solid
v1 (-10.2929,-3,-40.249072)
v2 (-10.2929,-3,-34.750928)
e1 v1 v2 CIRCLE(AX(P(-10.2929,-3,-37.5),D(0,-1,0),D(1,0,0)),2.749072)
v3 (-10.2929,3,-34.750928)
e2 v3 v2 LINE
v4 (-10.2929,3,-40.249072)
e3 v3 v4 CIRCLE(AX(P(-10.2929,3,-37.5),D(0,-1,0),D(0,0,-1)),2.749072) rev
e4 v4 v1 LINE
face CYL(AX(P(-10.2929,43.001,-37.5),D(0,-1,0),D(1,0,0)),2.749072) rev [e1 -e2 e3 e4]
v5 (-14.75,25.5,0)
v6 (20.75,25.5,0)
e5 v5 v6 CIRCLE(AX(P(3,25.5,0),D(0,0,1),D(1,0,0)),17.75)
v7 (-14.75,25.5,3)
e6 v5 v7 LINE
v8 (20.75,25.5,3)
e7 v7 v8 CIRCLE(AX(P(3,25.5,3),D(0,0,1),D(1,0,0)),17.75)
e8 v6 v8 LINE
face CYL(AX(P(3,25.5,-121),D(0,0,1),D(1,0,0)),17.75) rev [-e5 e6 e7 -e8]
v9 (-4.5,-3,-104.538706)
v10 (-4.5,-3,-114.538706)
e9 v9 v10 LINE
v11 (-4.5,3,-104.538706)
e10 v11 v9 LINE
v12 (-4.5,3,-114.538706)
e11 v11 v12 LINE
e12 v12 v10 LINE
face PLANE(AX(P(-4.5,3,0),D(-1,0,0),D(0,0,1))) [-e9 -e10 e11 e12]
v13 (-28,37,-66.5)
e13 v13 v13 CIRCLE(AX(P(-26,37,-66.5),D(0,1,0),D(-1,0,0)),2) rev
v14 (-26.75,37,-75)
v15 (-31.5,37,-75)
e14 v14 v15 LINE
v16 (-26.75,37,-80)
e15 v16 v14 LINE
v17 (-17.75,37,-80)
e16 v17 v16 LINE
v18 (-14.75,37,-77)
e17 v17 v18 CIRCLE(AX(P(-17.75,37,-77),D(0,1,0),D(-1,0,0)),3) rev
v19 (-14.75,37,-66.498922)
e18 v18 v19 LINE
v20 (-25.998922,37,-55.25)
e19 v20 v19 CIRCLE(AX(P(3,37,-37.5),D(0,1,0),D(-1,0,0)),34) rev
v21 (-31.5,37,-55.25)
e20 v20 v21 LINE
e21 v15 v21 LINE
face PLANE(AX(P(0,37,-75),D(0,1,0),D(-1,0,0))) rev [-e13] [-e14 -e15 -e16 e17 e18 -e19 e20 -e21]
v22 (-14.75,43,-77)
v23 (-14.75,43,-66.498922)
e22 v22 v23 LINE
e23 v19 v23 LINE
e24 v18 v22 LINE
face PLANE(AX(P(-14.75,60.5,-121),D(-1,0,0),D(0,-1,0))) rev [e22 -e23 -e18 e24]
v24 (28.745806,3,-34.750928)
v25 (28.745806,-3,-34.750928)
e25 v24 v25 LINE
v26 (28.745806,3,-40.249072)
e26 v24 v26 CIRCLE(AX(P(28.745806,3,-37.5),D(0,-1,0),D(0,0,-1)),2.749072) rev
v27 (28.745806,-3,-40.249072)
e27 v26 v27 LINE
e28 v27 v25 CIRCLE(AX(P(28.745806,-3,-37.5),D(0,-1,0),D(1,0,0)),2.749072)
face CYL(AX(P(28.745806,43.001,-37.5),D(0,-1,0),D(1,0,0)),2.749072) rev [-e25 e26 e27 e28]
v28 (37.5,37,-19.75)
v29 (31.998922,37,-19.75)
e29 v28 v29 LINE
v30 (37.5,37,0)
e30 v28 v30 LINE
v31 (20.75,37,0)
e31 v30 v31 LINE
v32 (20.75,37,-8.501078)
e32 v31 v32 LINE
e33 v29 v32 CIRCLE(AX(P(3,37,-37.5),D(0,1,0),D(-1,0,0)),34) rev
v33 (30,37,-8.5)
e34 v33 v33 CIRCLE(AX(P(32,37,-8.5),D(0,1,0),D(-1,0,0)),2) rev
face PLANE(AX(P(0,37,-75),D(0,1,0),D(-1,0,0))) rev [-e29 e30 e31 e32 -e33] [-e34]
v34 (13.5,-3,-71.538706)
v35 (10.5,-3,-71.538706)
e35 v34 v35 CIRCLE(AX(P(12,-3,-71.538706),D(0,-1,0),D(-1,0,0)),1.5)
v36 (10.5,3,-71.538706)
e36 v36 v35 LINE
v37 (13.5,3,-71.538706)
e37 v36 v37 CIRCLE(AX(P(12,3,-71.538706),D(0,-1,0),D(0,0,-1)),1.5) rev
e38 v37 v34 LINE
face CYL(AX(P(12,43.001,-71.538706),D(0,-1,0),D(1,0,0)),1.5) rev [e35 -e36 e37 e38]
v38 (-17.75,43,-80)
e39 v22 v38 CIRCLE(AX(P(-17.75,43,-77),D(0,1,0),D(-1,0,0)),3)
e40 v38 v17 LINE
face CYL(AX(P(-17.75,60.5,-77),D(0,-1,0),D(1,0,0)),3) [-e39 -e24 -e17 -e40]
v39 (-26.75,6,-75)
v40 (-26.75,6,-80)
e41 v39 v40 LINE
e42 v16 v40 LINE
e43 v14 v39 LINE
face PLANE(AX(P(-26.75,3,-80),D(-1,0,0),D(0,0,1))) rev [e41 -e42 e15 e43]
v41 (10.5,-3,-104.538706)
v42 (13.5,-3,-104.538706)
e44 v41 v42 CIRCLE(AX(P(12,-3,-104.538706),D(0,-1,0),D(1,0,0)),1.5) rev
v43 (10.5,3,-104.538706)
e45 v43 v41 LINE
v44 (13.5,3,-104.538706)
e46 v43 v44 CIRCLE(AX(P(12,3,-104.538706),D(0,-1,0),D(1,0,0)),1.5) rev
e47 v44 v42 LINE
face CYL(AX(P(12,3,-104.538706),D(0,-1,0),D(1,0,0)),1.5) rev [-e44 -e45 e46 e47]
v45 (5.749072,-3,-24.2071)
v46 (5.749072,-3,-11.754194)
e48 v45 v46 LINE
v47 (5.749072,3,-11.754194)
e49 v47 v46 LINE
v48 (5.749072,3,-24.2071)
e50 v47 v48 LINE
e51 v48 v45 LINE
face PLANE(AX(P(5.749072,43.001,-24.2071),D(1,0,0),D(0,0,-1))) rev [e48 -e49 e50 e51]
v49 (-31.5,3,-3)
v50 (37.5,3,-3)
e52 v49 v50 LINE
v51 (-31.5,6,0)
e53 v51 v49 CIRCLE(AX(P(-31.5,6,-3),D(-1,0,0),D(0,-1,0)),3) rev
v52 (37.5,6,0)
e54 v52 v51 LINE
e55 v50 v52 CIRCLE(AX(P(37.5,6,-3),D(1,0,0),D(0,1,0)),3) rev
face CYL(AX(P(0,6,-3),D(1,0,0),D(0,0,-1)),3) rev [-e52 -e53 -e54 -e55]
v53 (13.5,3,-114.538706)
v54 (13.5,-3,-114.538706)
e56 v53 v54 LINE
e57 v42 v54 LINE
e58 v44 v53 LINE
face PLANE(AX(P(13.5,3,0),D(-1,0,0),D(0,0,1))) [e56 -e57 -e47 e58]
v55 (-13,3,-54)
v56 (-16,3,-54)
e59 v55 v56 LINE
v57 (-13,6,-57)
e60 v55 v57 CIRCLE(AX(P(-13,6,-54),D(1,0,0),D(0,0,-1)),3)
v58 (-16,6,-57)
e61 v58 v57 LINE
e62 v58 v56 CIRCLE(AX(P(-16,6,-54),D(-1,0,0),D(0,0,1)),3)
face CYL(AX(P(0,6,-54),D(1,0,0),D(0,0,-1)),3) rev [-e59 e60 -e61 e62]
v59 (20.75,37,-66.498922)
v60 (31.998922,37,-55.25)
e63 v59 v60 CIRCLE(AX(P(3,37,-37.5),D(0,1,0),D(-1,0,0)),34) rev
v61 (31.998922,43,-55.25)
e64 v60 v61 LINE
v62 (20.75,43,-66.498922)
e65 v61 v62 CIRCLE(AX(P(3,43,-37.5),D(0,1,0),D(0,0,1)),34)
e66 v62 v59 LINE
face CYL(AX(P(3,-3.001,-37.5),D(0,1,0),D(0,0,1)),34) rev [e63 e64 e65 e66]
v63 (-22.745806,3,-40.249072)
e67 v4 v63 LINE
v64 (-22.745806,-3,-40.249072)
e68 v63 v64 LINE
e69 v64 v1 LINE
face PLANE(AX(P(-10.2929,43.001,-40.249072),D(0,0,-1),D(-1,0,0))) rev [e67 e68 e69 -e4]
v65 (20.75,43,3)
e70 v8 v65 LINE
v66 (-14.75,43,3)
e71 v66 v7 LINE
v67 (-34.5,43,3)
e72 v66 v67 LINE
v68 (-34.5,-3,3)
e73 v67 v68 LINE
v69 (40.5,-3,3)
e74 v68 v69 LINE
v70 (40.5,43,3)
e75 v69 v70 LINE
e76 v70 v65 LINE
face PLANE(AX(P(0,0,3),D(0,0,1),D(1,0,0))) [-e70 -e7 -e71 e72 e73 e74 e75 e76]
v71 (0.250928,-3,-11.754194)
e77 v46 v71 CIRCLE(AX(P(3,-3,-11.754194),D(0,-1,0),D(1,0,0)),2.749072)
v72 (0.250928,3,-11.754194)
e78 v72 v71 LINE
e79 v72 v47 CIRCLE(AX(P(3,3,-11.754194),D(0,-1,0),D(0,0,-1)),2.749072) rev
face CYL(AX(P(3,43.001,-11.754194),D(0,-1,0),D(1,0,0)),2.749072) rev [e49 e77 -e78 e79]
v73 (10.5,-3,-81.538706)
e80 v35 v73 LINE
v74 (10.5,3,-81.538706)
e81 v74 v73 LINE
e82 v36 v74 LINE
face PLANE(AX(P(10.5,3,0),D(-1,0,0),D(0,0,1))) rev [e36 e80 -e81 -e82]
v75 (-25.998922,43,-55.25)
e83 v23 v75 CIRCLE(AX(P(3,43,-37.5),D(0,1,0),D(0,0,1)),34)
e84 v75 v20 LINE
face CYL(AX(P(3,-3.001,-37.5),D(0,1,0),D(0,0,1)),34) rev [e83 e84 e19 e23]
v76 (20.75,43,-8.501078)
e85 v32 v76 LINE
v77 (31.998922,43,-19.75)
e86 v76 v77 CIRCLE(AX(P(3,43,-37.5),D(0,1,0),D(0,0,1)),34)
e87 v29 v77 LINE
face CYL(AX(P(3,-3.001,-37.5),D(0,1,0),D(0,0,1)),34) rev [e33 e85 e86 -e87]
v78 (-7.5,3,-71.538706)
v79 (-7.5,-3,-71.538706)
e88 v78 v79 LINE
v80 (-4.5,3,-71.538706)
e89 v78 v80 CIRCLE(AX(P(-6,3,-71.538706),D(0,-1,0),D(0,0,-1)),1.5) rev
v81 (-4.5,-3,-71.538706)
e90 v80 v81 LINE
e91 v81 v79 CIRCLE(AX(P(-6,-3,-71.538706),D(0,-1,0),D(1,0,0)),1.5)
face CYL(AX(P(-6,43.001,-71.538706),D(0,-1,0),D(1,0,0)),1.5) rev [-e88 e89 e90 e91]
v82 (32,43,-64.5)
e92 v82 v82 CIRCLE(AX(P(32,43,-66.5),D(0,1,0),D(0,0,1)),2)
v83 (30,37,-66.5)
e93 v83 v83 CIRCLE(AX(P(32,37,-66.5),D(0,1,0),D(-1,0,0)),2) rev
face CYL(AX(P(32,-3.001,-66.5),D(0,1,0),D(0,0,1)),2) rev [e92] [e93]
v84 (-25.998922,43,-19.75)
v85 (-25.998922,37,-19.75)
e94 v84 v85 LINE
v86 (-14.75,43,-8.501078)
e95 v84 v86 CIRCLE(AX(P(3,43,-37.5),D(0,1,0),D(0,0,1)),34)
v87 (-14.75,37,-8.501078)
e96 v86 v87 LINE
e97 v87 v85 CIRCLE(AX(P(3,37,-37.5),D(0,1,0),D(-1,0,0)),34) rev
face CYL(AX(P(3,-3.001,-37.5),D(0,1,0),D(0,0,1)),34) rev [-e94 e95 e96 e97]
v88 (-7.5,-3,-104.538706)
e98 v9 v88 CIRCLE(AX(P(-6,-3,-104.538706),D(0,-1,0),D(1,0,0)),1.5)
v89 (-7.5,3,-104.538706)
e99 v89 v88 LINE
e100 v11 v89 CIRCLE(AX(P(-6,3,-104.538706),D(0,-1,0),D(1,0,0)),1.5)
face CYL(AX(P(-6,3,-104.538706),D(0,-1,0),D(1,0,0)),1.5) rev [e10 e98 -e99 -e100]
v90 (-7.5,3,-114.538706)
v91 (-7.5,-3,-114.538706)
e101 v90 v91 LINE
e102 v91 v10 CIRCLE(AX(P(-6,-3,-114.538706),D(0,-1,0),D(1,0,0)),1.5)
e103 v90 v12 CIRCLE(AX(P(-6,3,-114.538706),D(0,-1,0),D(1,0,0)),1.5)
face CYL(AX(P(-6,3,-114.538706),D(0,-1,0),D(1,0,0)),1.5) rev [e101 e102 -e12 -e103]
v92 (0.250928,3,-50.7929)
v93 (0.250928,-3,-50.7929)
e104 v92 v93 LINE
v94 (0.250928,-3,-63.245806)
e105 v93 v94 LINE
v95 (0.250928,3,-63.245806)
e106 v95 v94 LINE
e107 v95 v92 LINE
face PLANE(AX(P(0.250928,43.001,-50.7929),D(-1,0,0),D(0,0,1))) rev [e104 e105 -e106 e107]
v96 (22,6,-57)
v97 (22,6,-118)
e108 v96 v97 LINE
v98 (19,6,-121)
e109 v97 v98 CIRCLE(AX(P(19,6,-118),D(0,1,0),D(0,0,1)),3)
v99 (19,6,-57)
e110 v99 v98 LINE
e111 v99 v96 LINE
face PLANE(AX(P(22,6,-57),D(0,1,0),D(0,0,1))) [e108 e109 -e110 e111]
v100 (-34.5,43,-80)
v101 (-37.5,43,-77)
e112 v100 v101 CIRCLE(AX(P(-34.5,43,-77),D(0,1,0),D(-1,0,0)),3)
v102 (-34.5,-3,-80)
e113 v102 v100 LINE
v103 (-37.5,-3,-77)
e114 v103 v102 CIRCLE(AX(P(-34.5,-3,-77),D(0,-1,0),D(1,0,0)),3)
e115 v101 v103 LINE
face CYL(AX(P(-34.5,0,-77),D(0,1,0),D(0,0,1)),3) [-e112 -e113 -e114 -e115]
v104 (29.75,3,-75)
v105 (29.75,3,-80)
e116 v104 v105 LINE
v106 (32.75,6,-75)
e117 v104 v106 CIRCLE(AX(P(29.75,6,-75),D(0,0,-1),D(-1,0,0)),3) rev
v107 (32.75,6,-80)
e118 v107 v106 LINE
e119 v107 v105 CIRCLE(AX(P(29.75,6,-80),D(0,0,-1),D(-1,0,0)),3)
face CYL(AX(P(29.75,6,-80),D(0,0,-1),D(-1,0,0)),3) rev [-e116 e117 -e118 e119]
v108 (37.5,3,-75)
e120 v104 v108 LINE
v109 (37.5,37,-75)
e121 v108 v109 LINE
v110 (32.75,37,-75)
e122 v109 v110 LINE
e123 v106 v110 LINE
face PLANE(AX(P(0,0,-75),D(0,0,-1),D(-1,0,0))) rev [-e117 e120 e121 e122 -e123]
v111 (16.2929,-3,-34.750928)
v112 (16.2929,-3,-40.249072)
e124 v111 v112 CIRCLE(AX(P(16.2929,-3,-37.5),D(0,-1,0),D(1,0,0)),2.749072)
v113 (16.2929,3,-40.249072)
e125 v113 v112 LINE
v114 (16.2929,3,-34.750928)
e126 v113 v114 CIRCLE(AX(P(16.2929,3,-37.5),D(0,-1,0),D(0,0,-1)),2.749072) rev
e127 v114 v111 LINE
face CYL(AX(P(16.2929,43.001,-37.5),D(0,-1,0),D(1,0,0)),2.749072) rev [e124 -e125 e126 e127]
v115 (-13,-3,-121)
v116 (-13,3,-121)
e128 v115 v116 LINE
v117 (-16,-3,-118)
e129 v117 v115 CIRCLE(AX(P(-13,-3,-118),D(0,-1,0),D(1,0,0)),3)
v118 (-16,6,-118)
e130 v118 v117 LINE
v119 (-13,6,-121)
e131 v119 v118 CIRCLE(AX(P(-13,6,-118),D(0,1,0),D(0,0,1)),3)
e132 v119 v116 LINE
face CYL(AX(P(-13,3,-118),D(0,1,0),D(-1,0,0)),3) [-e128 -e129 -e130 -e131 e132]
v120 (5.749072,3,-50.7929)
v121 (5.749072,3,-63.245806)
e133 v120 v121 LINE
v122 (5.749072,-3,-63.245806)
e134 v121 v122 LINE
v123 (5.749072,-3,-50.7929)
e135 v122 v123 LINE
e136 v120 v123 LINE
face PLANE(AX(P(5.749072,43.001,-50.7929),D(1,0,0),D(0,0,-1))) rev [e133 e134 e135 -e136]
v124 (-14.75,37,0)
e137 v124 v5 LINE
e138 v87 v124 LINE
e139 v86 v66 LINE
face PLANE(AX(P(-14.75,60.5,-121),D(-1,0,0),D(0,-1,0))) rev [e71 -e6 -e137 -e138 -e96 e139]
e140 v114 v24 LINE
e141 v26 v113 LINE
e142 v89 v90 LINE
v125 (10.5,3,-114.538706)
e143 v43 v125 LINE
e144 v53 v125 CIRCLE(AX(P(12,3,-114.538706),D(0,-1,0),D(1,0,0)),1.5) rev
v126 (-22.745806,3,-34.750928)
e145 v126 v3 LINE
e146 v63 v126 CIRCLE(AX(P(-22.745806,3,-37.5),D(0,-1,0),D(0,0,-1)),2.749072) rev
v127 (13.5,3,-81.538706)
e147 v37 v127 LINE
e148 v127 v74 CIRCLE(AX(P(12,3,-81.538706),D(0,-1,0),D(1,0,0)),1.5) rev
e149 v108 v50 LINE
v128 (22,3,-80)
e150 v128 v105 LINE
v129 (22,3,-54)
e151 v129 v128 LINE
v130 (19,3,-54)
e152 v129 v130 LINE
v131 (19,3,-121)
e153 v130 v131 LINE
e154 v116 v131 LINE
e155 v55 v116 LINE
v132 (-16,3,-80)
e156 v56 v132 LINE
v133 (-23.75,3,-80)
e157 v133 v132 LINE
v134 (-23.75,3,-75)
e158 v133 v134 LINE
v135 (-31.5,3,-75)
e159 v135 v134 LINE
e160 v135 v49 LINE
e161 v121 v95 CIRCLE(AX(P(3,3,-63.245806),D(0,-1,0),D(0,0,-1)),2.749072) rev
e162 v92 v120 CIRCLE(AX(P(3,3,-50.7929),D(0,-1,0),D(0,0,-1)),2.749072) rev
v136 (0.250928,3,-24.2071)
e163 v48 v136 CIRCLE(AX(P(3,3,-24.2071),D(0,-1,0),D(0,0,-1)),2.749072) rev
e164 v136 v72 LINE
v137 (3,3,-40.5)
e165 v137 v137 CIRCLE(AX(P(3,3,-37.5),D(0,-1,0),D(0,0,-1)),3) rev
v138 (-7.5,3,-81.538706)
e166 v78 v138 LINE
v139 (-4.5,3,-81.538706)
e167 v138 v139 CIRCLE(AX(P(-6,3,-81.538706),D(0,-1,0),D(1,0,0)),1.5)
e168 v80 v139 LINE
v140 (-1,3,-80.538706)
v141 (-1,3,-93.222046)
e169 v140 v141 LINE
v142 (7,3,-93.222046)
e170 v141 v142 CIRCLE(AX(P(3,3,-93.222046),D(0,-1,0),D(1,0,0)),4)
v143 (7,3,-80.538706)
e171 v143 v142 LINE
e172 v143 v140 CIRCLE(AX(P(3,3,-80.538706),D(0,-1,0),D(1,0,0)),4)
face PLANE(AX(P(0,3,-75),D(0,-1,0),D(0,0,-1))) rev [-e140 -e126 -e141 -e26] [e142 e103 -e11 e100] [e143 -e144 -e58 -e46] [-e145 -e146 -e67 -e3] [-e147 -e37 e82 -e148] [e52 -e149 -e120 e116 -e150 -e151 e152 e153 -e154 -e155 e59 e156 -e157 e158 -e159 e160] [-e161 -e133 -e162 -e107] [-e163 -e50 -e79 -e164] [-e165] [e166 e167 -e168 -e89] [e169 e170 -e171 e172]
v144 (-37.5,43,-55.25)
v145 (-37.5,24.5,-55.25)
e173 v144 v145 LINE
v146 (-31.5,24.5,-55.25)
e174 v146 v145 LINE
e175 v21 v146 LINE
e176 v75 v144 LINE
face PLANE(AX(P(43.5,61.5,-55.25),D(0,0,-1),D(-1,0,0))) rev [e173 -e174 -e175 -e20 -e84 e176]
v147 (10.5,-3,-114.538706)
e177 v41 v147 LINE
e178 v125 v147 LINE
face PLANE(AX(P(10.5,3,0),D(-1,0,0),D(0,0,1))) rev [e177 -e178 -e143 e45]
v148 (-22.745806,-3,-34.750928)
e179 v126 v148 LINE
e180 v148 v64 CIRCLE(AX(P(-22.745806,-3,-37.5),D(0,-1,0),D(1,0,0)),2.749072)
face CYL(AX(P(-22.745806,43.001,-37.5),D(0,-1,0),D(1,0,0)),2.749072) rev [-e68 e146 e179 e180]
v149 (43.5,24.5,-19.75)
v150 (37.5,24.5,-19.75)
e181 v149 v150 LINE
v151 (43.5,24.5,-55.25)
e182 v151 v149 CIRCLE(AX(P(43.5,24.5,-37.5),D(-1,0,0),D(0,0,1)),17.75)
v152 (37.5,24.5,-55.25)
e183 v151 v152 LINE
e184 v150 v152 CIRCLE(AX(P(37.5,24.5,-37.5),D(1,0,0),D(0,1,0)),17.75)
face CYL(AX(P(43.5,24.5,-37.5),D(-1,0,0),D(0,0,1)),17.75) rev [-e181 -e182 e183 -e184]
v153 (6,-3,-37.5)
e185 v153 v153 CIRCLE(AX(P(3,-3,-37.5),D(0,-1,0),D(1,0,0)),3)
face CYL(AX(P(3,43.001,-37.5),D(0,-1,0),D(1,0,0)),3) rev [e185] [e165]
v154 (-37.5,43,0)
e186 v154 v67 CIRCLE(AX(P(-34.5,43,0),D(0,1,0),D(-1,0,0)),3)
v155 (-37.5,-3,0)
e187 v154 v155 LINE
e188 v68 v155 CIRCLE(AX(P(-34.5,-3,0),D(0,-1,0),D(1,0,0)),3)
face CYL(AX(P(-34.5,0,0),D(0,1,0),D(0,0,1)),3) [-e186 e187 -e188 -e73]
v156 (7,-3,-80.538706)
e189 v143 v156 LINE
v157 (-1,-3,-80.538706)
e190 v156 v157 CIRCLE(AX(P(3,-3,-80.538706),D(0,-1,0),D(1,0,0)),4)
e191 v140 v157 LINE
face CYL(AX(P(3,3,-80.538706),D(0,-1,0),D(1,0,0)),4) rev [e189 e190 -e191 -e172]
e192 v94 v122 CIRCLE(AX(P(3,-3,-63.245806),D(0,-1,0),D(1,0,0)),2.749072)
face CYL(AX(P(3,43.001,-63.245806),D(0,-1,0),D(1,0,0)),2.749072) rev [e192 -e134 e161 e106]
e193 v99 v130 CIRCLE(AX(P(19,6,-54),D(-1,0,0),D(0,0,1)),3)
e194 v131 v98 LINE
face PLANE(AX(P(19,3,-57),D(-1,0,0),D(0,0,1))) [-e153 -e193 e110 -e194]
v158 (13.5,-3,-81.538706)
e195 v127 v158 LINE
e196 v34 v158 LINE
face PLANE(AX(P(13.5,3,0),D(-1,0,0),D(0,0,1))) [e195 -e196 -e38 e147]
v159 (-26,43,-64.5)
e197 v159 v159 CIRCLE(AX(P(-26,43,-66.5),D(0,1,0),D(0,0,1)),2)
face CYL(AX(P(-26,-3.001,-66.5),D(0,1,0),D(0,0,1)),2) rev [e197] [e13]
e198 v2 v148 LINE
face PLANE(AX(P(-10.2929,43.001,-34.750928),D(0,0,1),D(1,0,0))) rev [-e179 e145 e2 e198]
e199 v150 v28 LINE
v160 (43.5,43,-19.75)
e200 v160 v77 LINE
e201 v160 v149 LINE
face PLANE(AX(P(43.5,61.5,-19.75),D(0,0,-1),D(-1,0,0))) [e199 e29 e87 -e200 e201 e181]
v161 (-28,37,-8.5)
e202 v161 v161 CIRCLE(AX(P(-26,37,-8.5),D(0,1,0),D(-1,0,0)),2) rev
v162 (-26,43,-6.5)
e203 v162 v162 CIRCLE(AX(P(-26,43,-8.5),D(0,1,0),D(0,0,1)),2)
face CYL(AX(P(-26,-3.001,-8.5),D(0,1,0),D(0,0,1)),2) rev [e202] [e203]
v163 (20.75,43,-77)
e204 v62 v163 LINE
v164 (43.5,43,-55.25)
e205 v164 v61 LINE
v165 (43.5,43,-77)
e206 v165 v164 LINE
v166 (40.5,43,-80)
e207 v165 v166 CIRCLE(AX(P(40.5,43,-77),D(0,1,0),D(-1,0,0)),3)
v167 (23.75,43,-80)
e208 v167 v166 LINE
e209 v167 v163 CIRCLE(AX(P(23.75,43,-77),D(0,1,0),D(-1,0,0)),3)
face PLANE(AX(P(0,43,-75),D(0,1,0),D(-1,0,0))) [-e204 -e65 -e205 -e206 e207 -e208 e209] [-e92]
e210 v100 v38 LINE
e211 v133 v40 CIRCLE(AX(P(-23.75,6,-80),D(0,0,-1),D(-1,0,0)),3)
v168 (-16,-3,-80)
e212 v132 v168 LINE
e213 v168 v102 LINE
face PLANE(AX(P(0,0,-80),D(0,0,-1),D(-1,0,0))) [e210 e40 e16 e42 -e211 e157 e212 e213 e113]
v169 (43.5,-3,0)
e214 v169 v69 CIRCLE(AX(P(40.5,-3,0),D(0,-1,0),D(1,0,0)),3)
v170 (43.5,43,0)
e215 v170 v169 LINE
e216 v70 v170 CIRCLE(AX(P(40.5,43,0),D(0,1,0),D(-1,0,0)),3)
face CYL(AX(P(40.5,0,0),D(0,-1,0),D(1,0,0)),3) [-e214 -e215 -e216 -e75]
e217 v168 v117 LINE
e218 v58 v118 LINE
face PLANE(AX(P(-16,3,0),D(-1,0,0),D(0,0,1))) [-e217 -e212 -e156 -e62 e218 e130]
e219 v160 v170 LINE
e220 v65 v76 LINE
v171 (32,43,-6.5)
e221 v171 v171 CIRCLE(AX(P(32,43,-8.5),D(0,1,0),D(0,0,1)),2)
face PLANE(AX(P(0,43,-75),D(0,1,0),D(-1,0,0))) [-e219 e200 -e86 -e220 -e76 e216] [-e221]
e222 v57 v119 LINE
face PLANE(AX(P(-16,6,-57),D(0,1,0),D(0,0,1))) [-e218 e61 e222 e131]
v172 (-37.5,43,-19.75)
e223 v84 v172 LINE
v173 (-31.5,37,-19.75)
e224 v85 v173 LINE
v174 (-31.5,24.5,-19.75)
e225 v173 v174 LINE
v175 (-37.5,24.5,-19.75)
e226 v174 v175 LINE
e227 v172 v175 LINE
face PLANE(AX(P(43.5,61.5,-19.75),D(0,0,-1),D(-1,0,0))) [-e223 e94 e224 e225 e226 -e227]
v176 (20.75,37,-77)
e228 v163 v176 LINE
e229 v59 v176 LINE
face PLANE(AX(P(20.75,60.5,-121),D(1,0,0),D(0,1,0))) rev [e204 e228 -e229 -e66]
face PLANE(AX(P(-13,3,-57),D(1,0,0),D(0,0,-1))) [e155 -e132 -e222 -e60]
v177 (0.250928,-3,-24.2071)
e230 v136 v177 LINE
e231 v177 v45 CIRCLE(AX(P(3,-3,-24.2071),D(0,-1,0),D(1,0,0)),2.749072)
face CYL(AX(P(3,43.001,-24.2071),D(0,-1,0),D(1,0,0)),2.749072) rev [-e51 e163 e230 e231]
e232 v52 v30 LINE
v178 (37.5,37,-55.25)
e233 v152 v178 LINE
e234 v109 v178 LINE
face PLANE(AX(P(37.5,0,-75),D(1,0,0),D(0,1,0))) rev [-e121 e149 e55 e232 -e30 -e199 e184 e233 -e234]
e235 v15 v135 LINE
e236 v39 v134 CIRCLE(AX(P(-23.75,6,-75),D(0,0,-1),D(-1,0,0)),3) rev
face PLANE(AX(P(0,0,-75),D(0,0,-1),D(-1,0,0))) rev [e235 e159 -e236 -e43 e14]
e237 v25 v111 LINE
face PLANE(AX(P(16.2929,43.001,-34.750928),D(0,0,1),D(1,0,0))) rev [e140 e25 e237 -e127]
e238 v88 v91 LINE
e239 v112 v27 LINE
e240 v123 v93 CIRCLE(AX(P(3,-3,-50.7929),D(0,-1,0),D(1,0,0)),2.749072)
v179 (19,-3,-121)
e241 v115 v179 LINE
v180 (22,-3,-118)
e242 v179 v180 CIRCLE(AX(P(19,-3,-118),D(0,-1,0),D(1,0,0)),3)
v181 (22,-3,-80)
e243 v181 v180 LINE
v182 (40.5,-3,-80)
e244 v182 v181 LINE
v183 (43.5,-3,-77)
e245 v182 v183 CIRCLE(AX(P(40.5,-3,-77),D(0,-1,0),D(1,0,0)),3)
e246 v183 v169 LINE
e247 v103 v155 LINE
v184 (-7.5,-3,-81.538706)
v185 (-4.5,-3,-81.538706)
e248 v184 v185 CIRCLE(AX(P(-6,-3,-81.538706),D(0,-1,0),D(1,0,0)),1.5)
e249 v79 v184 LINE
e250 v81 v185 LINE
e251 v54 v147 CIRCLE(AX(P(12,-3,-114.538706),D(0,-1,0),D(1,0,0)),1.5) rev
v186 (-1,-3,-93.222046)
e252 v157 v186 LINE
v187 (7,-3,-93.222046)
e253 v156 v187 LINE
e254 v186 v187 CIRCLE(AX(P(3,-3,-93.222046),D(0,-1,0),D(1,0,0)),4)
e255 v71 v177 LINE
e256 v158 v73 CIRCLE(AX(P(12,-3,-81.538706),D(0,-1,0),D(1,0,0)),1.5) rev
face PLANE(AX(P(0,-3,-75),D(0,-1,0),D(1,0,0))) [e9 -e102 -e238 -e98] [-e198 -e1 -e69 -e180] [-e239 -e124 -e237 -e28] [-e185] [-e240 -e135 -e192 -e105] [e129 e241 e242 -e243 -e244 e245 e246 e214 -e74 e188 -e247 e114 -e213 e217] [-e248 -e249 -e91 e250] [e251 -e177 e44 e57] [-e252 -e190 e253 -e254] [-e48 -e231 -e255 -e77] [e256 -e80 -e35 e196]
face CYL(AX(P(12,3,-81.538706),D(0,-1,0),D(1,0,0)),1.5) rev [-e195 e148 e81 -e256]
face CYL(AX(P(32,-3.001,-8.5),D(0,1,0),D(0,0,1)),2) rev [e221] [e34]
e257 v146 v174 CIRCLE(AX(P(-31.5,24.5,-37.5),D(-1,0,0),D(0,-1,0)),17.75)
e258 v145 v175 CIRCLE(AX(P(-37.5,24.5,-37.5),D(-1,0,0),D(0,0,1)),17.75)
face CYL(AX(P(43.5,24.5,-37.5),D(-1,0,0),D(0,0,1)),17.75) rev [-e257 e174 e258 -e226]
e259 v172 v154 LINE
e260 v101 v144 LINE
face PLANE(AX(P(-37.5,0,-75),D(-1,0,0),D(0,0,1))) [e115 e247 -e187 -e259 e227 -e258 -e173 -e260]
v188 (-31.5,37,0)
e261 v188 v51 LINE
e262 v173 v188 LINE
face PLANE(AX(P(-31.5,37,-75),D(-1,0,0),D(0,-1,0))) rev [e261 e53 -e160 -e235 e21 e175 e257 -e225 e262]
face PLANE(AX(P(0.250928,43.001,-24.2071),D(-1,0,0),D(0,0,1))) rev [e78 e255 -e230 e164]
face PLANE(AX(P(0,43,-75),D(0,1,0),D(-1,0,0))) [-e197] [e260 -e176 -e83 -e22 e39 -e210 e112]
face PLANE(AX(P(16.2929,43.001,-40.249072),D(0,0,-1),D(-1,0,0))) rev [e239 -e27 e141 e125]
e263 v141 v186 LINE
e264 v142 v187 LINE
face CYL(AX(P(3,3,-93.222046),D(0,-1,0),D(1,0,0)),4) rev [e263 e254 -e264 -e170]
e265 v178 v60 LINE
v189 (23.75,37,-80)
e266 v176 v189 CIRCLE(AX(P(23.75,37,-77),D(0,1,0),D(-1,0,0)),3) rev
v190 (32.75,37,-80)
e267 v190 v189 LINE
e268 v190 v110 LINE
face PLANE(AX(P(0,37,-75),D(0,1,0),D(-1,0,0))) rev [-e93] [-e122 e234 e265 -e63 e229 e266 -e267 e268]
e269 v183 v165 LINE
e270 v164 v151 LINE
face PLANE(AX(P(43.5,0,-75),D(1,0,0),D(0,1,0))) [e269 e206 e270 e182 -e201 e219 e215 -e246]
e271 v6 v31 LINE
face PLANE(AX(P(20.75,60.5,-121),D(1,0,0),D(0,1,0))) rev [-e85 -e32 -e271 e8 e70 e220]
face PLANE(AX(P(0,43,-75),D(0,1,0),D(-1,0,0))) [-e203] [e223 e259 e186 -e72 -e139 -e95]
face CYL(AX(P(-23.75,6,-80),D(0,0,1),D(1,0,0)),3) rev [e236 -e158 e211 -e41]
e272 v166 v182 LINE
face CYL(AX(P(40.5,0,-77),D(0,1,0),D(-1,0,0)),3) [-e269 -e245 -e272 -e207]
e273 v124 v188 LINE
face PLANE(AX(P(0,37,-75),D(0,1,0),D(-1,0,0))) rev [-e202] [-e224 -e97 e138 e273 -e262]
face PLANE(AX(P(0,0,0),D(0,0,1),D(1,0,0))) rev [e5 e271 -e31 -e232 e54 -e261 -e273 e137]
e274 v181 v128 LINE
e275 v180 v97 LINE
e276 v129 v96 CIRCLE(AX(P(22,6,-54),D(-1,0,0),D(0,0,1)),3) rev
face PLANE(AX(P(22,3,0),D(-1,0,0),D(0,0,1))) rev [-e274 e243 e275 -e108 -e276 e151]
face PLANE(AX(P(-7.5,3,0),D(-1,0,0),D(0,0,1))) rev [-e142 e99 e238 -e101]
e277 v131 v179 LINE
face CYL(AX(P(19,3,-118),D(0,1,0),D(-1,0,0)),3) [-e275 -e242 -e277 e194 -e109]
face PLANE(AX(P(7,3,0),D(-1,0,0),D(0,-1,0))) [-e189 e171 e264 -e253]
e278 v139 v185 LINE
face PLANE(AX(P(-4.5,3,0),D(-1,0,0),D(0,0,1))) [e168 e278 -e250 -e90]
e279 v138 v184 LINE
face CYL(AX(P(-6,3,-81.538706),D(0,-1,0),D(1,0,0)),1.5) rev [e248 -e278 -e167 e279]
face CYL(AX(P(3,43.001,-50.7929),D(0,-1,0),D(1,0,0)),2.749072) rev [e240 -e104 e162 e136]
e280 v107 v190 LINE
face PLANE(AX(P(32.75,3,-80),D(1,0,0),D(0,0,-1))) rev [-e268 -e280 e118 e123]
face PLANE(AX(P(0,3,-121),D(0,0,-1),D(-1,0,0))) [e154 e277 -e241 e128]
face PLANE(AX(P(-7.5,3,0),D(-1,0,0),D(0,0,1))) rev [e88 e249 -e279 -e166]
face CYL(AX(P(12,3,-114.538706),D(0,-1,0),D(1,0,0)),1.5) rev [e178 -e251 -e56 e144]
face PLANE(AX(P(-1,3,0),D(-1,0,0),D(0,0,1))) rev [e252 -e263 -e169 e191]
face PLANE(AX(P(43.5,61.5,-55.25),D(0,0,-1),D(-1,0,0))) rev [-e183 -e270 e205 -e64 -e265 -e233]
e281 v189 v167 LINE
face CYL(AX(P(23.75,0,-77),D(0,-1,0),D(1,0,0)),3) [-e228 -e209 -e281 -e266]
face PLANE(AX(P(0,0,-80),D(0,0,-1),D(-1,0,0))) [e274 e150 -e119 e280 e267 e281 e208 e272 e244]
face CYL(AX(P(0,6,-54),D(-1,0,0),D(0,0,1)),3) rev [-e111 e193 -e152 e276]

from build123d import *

# Parameters (mm, degrees)
SKETCH1_W            = 75
SKETCH1_H            = 6
BOSS_EXTRUDE1_DEPTH  = 75
CUT_EXTRUDE1_REACH   = 100.149
SKETCH2_R            = 2
CUT_EXTRUDE2_REACH   = 100.149
SKETCH3_R            = 3
BOSS_EXTRUDE5_DEPTH  = 6
CUT_EXTRUDE3_REACH   = 138.562
SKETCH14_W           = 3
SKETCH14_H           = 3
BOSS_EXTRUDE6_DEPTH  = 64
SKETCH15_W           = 81
SKETCH15_H           = 46
BOSS_EXTRUDE7_DEPTH  = 3
FILLET6_R            = 3
FILLET7_R            = 3
FILLET9_R            = 3
FILLET10_R           = 3
FILLET11_R           = 3
FILLET12_R           = 3
SKETCH22_W           = 6
SKETCH22_H           = 34
BOSS_EXTRUDE9_DEPTH  = 75
FILLET13_R           = 3
CUT_EXTRUDE8_REACH   = 138.562
CUT_EXTRUDE10_DEPTH  = 152.825557796
CUT_EXTRUDE11_DEPTH  = 139.265143836
BOSS_EXTRUDE12_DEPTH = 5
FILLET28_R           = 3
FILLET29_R           = 3
FILLET30_R           = 3
FILLET31_R           = 3
FILLET32_R           = 3
FILLET33_R           = 3


with BuildPart() as part:
    # Sketch1 → Boss-Extrude1 (new body)
    with BuildSketch(Plane.XY):
        Polygon((-37.5, 37), (37.5, 37), (43.5, 37), (43.5, 43), (-37.5, 43), align=None)
        Polygon((37.5, 37), (37.5, 3), (37.5, -3), (43.5, -3), (43.5, 37), align=None)
        Rectangle(SKETCH1_W, SKETCH1_H)
    extrude(amount=-BOSS_EXTRUDE1_DEPTH)

    # Sketch2 → Cut-Extrude1 (cut, up to next)
    with BuildSketch(Plane(origin=(0, 43, 0), x_dir=(1, 0, 0), z_dir=(0, 1, 0)), mode=Mode.PRIVATE) as cut_extrude1_sk1:
        with Locations(Location((-26, 8.5, 0), (0, 0, 270))):
            Circle(SKETCH2_R)
    cut_extrude1_tool1 = extrude(cut_extrude1_sk1.sketch, amount=-CUT_EXTRUDE1_REACH, mode=Mode.PRIVATE) & part.part
    # Sketch2 → Cut-Extrude1 (cut, up to next)
    with BuildSketch(Plane(origin=(0, 43, 0), x_dir=(1, 0, 0), z_dir=(0, 1, 0)), mode=Mode.PRIVATE) as cut_extrude1_sk2:
        with BuildLine():
            ThreePointArc((-26, 19.751760651), (-21.04163056, 13.45836944), (-14.748239349, 8.5))
            Line((-14.748239349, 8.5), (20.748239349, 8.5))
            ThreePointArc((20.748239349, 8.5), (27.04163056, 13.45836944), (32, 19.751760651))
            Line((32, 19.751760651), (32, 55.248239349))
            ThreePointArc((32, 55.248239349), (27.04163056, 61.54163056), (20.748239349, 66.5))
            Line((20.748239349, 66.5), (-14.748239349, 66.5))
            ThreePointArc((-14.748239349, 66.5), (-21.04163056, 61.54163056), (-26, 55.248239349))
            Line((-26, 55.248239349), (-26, 19.751760651))
        make_face()
    cut_extrude1_tool2 = extrude(cut_extrude1_sk2.sketch, amount=-CUT_EXTRUDE1_REACH, mode=Mode.PRIVATE) & part.part
    # Sketch2 → Cut-Extrude1 (cut, up to next)
    with BuildSketch(Plane(origin=(0, 43, 0), x_dir=(1, 0, 0), z_dir=(0, 1, 0)), mode=Mode.PRIVATE) as cut_extrude1_sk3:
        with Locations(Location((32, 8.5, 0), (0, 0, 270))):
            Circle(SKETCH2_R)
    cut_extrude1_tool3 = extrude(cut_extrude1_sk3.sketch, amount=-CUT_EXTRUDE1_REACH, mode=Mode.PRIVATE) & part.part
    # Sketch2 → Cut-Extrude1 (cut, up to next)
    with BuildSketch(Plane(origin=(0, 43, 0), x_dir=(1, 0, 0), z_dir=(0, 1, 0)), mode=Mode.PRIVATE) as cut_extrude1_sk4:
        with Locations(Location((-26, 66.5, 0), (0, 0, 270))):
            Circle(SKETCH2_R)
    cut_extrude1_tool4 = extrude(cut_extrude1_sk4.sketch, amount=-CUT_EXTRUDE1_REACH, mode=Mode.PRIVATE) & part.part
    # Sketch2 → Cut-Extrude1 (cut, up to next)
    with BuildSketch(Plane(origin=(0, 43, 0), x_dir=(1, 0, 0), z_dir=(0, 1, 0)), mode=Mode.PRIVATE) as cut_extrude1_sk5:
        with Locations(Location((32, 66.5, 0), (0, 0, 270))):
            Circle(SKETCH2_R)
    cut_extrude1_tool5 = extrude(cut_extrude1_sk5.sketch, amount=-CUT_EXTRUDE1_REACH, mode=Mode.PRIVATE) & part.part
    add(cut_extrude1_tool1.solids().sort_by_distance((-26, 43, -8.5))[0], mode=Mode.SUBTRACT)
    add(cut_extrude1_tool2.solids().sort_by_distance((3, 43, -37.5))[0], mode=Mode.SUBTRACT)
    add(cut_extrude1_tool3.solids().sort_by_distance((32, 43, -8.5))[0], mode=Mode.SUBTRACT)
    add(cut_extrude1_tool4.solids().sort_by_distance((-26, 43, -66.5))[0], mode=Mode.SUBTRACT)
    add(cut_extrude1_tool5.solids().sort_by_distance((32, 43, -66.5))[0], mode=Mode.SUBTRACT)

    # Sketch3 → Cut-Extrude2 (cut, up to next)
    with BuildSketch(Plane.XZ.offset(3), mode=Mode.PRIVATE) as cut_extrude2_sk1:
        with Locations((3, -37.5)):
            Circle(SKETCH3_R)
    cut_extrude2_tool1 = extrude(cut_extrude2_sk1.sketch, amount=-CUT_EXTRUDE2_REACH, mode=Mode.PRIVATE) & part.part
    add(cut_extrude2_tool1.solids().sort_by_distance((3, -3, -37.5))[0], mode=Mode.SUBTRACT)

    # Sketch11 → Boss-Extrude5 (add)
    # profile 1 of 3: a face of its own
    with BuildSketch(Plane.XZ.offset(3)):
        with BuildLine():
            Line((-1, -93.222045862), (-1, -80.538706378))
            Line((-1, -80.538706378), (-4.5, -80.538706378))
            Line((-4.5, -80.538706378), (-4.5, -81.538706378))
            ThreePointArc((-4.5, -81.538706378), (-6, -83.038706378), (-7.5, -81.538706378))
            Line((-7.5, -81.538706378), (-7.5, -75))
            Line((-7.5, -75), (-16, -75))
            Line((-16, -75), (-16, -121))
            Line((-16, -121), (3, -121))
            Line((3, -121), (3, -97.222045862))
            ThreePointArc((3, -97.222045862), (0.171572875, -96.050472986), (-1, -93.222045862))
        make_face()
        with BuildLine():
            ThreePointArc((-7.5, -104.538706378), (-6, -103.038706378), (-4.5, -104.538706378))
            Line((-4.5, -104.538706378), (-4.5, -114.538706378))
            ThreePointArc((-4.5, -114.538706378), (-6, -116.038706378), (-7.5, -114.538706378))
            Line((-7.5, -114.538706378), (-7.5, -104.538706378))
        make_face(mode=Mode.SUBTRACT)
    # profile 2 of 3: a face of its own
    with BuildSketch(Plane.XZ.offset(3)):
        with BuildLine():
            Line((10.5, -75), (3, -75))
            Line((3, -75), (3, -76.538706378))
            ThreePointArc((3, -76.538706378), (5.828427125, -77.710279254), (7, -80.538706378))
            Line((7, -80.538706378), (7, -93.222045862))
            ThreePointArc((7, -93.222045862), (5.828427125, -96.050472986), (3, -97.222045862))
            Line((3, -97.222045862), (3, -121))
            Line((3, -121), (22, -121))
            Line((22, -121), (22, -75))
            Line((22, -75), (13.5, -75))
            Line((13.5, -75), (13.5, -81.538706378))
            ThreePointArc((13.5, -81.538706378), (12, -83.038706378), (10.5, -81.538706378))
            Line((10.5, -81.538706378), (10.5, -75))
        make_face()
        with BuildLine():
            Line((10.5, -114.538706378), (10.5, -104.538706378))
            ThreePointArc((10.5, -104.538706378), (12, -103.038706378), (13.5, -104.538706378))
            Line((13.5, -104.538706378), (13.5, -114.538706378))
            ThreePointArc((13.5, -114.538706378), (12, -116.038706378), (10.5, -114.538706378))
        make_face(mode=Mode.SUBTRACT)
    # profile 3 of 3: a face of its own
    with BuildSketch(Plane.XZ.offset(3)):
        with BuildLine():
            Line((3, -76.538706378), (3, -75))
            Line((3, -75), (-4.5, -75))
            Line((-4.5, -75), (-4.5, -80.538706378))
            Line((-4.5, -80.538706378), (-1, -80.538706378))
            ThreePointArc((-1, -80.538706378), (0.171572875, -77.710279254), (3, -76.538706378))
        make_face()
    extrude(amount=-BOSS_EXTRUDE5_DEPTH)

    # Sketch12 → Cut-Extrude3 (cut, up to next)
    with BuildSketch(Plane.XZ.offset(3), mode=Mode.PRIVATE) as cut_extrude3_sk1:
        with BuildLine():
            Line((-7.5, -81.538706378), (-7.5, -71.538706378))
            ThreePointArc((-7.5, -71.538706378), (-6, -70.038706378), (-4.5, -71.538706378))
            Line((-4.5, -71.538706378), (-4.5, -81.538706378))
            ThreePointArc((-4.5, -81.538706378), (-6, -83.038706378), (-7.5, -81.538706378))
        make_face()
    cut_extrude3_tool1 = extrude(cut_extrude3_sk1.sketch, amount=-CUT_EXTRUDE3_REACH, mode=Mode.PRIVATE) & part.part
    # Sketch12 → Cut-Extrude3 (cut, up to next)
    with BuildSketch(Plane.XZ.offset(3), mode=Mode.PRIVATE) as cut_extrude3_sk2:
        with BuildLine():
            Line((13.5, -81.538706378), (13.5, -71.538706378))
            ThreePointArc((13.5, -71.538706378), (12, -70.038706378), (10.5, -71.538706378))
            Line((10.5, -71.538706378), (10.5, -81.538706378))
            ThreePointArc((10.5, -81.538706378), (12, -83.038706378), (13.5, -81.538706378))
        make_face()
    cut_extrude3_tool2 = extrude(cut_extrude3_sk2.sketch, amount=-CUT_EXTRUDE3_REACH, mode=Mode.PRIVATE) & part.part
    add(cut_extrude3_tool1.solids().sort_by_distance((-6, -3, -76.538706))[0], mode=Mode.SUBTRACT)
    add(cut_extrude3_tool2.solids().sort_by_distance((12, -3, -76.538706))[0], mode=Mode.SUBTRACT)

    # Sketch14 → Boss-Extrude6 (add)
    with BuildSketch(Plane(origin=(0, 0, -121), x_dir=(-1, 0, 0), z_dir=(0, 0, -1))):
        with Locations((-20.5, 4.5)):
            Rectangle(SKETCH14_W, SKETCH14_H)
        with Locations((14.5, 4.5)):
            Rectangle(SKETCH14_W, SKETCH14_H)
    extrude(amount=-BOSS_EXTRUDE6_DEPTH)

    # Sketch15 → Boss-Extrude7 (add)
    with BuildSketch(Plane.XY):
        with Locations((3, 20)):
            Rectangle(SKETCH15_W, SKETCH15_H)
    extrude(amount=BOSS_EXTRUDE7_DEPTH)

    # Fillet6
    fillet6_edges = [part.edges().sort_by_distance(p)[0] for p in [
        (43.5, 20, 3),
    ]]
    fillet(fillet6_edges, radius=FILLET6_R)

    # Fillet7
    fillet7_edges = [part.edges().sort_by_distance(p)[0] for p in [
        (-37.5, 20, 3),
    ]]
    fillet(fillet7_edges, radius=FILLET7_R - 0.0001)  # a hair under: the kernel refuses the full size

    # Fillet9
    fillet9_edges = [part.edges().sort_by_distance(p)[0] for p in [
        (22, 1.5, -121),
    ]]
    fillet(fillet9_edges, radius=FILLET9_R)

    # Fillet10
    fillet10_edges = [part.edges().sort_by_distance(p)[0] for p in [
        (-16, 1.5, -121),
    ]]
    fillet(fillet10_edges, radius=FILLET10_R - 0.0001)  # a hair under: the kernel refuses the full size

    # Fillet11
    fillet11_edges = [part.edges().sort_by_distance(p)[0] for p in [
        (-14.5, 3, -57),
    ]]
    fillet(fillet11_edges, radius=FILLET11_R - 0.0001)  # a hair under: the kernel refuses the full size

    # Fillet12
    fillet12_edges = [part.edges().sort_by_distance(p)[0] for p in [
        (20.5, 3, -57),
    ]]
    fillet(fillet12_edges, radius=FILLET12_R - 0.0001)  # a hair under: the kernel refuses the full size

    # Sketch22 → Boss-Extrude9 (add)
    with BuildSketch(Plane(origin=(0, 0, 0), x_dir=(-1, 0, 0), z_dir=(0, 0, -1))):
        with Locations((34.5, 20)):
            Rectangle(SKETCH22_W, SKETCH22_H)
    extrude(amount=BOSS_EXTRUDE9_DEPTH)

    # Fillet13
    fillet13_edges = [part.edges().sort_by_distance(p)[0] for p in [
        (3, 3, 0),
    ]]
    fillet(fillet13_edges, radius=FILLET13_R)

    # Sketch26 → Cut-Extrude8 (cut, up to next)
    with BuildSketch(Plane.XZ.offset(3), mode=Mode.PRIVATE) as cut_extrude8_sk1:
        with BuildLine():
            Line((5.749072371, -50.792900192), (5.749072371, -63.245806186))
            ThreePointArc((5.749072371, -63.245806186), (3, -65.994878557), (0.250927629, -63.245806186))
            Line((0.250927629, -63.245806186), (0.250927629, -50.792900192))
            ThreePointArc((0.250927629, -50.792900192), (3, -48.043827821), (5.749072371, -50.792900192))
        make_face()
    cut_extrude8_tool1 = extrude(cut_extrude8_sk1.sketch, amount=-CUT_EXTRUDE8_REACH, mode=Mode.PRIVATE) & part.part
    # Sketch26 → Cut-Extrude8 (cut, up to next)
    with BuildSketch(Plane.XZ.offset(3), mode=Mode.PRIVATE) as cut_extrude8_sk2:
        with BuildLine():
            Line((-10.292900192, -40.249072371), (-22.745806186, -40.249072371))
            ThreePointArc((-22.745806186, -40.249072371), (-25.494878557, -37.5), (-22.745806186, -34.750927629))
            Line((-22.745806186, -34.750927629), (-10.292900192, -34.750927629))
            ThreePointArc((-10.292900192, -34.750927629), (-7.543827821, -37.5), (-10.292900192, -40.249072371))
        make_face()
    cut_extrude8_tool2 = extrude(cut_extrude8_sk2.sketch, amount=-CUT_EXTRUDE8_REACH, mode=Mode.PRIVATE) & part.part
    # Sketch26 → Cut-Extrude8 (cut, up to next)
    with BuildSketch(Plane.XZ.offset(3), mode=Mode.PRIVATE) as cut_extrude8_sk3:
        with BuildLine():
            Line((0.250927629, -24.207099808), (0.250927629, -11.754193814))
            ThreePointArc((0.250927629, -11.754193814), (3, -9.005121443), (5.749072371, -11.754193814))
            Line((5.749072371, -11.754193814), (5.749072371, -24.207099808))
            ThreePointArc((5.749072371, -24.207099808), (3, -26.956172179), (0.250927629, -24.207099808))
        make_face()
    cut_extrude8_tool3 = extrude(cut_extrude8_sk3.sketch, amount=-CUT_EXTRUDE8_REACH, mode=Mode.PRIVATE) & part.part
    # Sketch26 → Cut-Extrude8 (cut, up to next)
    with BuildSketch(Plane.XZ.offset(3), mode=Mode.PRIVATE) as cut_extrude8_sk4:
        with BuildLine():
            Line((16.292900192, -34.750927629), (28.745806186, -34.750927629))
            ThreePointArc((28.745806186, -34.750927629), (31.494878557, -37.5), (28.745806186, -40.249072371))
            Line((28.745806186, -40.249072371), (16.292900192, -40.249072371))
            ThreePointArc((16.292900192, -40.249072371), (13.543827821, -37.5), (16.292900192, -34.750927629))
        make_face()
    cut_extrude8_tool4 = extrude(cut_extrude8_sk4.sketch, amount=-CUT_EXTRUDE8_REACH, mode=Mode.PRIVATE) & part.part
    add(cut_extrude8_tool1.solids().sort_by_distance((3, -3, -57.019353))[0], mode=Mode.SUBTRACT)
    add(cut_extrude8_tool2.solids().sort_by_distance((-16.519353, -3, -37.5))[0], mode=Mode.SUBTRACT)
    add(cut_extrude8_tool3.solids().sort_by_distance((3, -3, -17.980647))[0], mode=Mode.SUBTRACT)
    add(cut_extrude8_tool4.solids().sort_by_distance((22.519353, -3, -37.5))[0], mode=Mode.SUBTRACT)

    # Sketch30 → Cut-Extrude10 (cut, through all)
    with BuildSketch(Plane.ZY.offset(37.5)):
        with BuildLine():
            Line((-19.75, 61.5), (-19.75, 24.5))
            ThreePointArc((-19.75, 24.5), (-37.5, 6.75), (-55.25, 24.5))
            Line((-55.25, 24.5), (-55.25, 61.5))
            ThreePointArc((-55.25, 61.5), (-37.5, 79.25), (-19.75, 61.5))
        make_face()
    extrude(amount=-CUT_EXTRUDE10_DEPTH, mode=Mode.SUBTRACT)

    # Sketch31 → Cut-Extrude11 (cut, through all)
    with BuildSketch(Plane.XY.offset(3)):
        with BuildLine():
            Line((20.75, 60.5), (20.75, 25.5))
            ThreePointArc((20.75, 25.5), (3, 7.75), (-14.75, 25.5))
            Line((-14.75, 25.5), (-14.75, 60.5))
            ThreePointArc((-14.75, 60.5), (3, 78.25), (20.75, 60.5))
        make_face()
    extrude(amount=-CUT_EXTRUDE11_DEPTH, mode=Mode.SUBTRACT)

    # Sketch35 → Boss-Extrude12 (add)
    with BuildSketch(Plane(origin=(0, 0, -75), x_dir=(-1, 0, 0), z_dir=(0, 0, -1))):
        Polygon((-20.75, 37), (-20.75, 43), (-43.5, 43), (-43.5, -3), (-22, -3), (-22, 3), (-32.75, 3), (-32.75, 37), align=None)
        Polygon((26.75, 3), (26.75, 37), (14.75, 37), (14.75, 43), (37.5, 43), (37.5, -3), (16, -3), (16, 3), align=None)
    extrude(amount=BOSS_EXTRUDE12_DEPTH)

    # Fillet28
    fillet28_edges = [part.edges().sort_by_distance(p)[0] for p in [
        (-37.5, 20, -80),
    ]]
    fillet(fillet28_edges, radius=FILLET28_R)

    # Fillet29
    fillet29_edges = [part.edges().sort_by_distance(p)[0] for p in [
        (43.5, 20, -80),
    ]]
    fillet(fillet29_edges, radius=FILLET29_R)

    # Fillet30
    fillet30_edges = [part.edges().sort_by_distance(p)[0] for p in [
        (20.75, 40, -80),
    ]]
    fillet(fillet30_edges, radius=FILLET30_R)

    # Fillet31
    fillet31_edges = [part.edges().sort_by_distance(p)[0] for p in [
        (-14.75, 40, -80),
    ]]
    fillet(fillet31_edges, radius=FILLET31_R)

    # Fillet32
    fillet32_edges = [part.edges().sort_by_distance(p)[0] for p in [
        (-26.75, 3, -77.5),
    ]]
    fillet(fillet32_edges, radius=FILLET32_R)

    # Fillet33
    fillet33_edges = [part.edges().sort_by_distance(p)[0] for p in [
        (32.75, 3, -77.5),
    ]]
    fillet(fillet33_edges, radius=FILLET33_R)


solid = part.part
